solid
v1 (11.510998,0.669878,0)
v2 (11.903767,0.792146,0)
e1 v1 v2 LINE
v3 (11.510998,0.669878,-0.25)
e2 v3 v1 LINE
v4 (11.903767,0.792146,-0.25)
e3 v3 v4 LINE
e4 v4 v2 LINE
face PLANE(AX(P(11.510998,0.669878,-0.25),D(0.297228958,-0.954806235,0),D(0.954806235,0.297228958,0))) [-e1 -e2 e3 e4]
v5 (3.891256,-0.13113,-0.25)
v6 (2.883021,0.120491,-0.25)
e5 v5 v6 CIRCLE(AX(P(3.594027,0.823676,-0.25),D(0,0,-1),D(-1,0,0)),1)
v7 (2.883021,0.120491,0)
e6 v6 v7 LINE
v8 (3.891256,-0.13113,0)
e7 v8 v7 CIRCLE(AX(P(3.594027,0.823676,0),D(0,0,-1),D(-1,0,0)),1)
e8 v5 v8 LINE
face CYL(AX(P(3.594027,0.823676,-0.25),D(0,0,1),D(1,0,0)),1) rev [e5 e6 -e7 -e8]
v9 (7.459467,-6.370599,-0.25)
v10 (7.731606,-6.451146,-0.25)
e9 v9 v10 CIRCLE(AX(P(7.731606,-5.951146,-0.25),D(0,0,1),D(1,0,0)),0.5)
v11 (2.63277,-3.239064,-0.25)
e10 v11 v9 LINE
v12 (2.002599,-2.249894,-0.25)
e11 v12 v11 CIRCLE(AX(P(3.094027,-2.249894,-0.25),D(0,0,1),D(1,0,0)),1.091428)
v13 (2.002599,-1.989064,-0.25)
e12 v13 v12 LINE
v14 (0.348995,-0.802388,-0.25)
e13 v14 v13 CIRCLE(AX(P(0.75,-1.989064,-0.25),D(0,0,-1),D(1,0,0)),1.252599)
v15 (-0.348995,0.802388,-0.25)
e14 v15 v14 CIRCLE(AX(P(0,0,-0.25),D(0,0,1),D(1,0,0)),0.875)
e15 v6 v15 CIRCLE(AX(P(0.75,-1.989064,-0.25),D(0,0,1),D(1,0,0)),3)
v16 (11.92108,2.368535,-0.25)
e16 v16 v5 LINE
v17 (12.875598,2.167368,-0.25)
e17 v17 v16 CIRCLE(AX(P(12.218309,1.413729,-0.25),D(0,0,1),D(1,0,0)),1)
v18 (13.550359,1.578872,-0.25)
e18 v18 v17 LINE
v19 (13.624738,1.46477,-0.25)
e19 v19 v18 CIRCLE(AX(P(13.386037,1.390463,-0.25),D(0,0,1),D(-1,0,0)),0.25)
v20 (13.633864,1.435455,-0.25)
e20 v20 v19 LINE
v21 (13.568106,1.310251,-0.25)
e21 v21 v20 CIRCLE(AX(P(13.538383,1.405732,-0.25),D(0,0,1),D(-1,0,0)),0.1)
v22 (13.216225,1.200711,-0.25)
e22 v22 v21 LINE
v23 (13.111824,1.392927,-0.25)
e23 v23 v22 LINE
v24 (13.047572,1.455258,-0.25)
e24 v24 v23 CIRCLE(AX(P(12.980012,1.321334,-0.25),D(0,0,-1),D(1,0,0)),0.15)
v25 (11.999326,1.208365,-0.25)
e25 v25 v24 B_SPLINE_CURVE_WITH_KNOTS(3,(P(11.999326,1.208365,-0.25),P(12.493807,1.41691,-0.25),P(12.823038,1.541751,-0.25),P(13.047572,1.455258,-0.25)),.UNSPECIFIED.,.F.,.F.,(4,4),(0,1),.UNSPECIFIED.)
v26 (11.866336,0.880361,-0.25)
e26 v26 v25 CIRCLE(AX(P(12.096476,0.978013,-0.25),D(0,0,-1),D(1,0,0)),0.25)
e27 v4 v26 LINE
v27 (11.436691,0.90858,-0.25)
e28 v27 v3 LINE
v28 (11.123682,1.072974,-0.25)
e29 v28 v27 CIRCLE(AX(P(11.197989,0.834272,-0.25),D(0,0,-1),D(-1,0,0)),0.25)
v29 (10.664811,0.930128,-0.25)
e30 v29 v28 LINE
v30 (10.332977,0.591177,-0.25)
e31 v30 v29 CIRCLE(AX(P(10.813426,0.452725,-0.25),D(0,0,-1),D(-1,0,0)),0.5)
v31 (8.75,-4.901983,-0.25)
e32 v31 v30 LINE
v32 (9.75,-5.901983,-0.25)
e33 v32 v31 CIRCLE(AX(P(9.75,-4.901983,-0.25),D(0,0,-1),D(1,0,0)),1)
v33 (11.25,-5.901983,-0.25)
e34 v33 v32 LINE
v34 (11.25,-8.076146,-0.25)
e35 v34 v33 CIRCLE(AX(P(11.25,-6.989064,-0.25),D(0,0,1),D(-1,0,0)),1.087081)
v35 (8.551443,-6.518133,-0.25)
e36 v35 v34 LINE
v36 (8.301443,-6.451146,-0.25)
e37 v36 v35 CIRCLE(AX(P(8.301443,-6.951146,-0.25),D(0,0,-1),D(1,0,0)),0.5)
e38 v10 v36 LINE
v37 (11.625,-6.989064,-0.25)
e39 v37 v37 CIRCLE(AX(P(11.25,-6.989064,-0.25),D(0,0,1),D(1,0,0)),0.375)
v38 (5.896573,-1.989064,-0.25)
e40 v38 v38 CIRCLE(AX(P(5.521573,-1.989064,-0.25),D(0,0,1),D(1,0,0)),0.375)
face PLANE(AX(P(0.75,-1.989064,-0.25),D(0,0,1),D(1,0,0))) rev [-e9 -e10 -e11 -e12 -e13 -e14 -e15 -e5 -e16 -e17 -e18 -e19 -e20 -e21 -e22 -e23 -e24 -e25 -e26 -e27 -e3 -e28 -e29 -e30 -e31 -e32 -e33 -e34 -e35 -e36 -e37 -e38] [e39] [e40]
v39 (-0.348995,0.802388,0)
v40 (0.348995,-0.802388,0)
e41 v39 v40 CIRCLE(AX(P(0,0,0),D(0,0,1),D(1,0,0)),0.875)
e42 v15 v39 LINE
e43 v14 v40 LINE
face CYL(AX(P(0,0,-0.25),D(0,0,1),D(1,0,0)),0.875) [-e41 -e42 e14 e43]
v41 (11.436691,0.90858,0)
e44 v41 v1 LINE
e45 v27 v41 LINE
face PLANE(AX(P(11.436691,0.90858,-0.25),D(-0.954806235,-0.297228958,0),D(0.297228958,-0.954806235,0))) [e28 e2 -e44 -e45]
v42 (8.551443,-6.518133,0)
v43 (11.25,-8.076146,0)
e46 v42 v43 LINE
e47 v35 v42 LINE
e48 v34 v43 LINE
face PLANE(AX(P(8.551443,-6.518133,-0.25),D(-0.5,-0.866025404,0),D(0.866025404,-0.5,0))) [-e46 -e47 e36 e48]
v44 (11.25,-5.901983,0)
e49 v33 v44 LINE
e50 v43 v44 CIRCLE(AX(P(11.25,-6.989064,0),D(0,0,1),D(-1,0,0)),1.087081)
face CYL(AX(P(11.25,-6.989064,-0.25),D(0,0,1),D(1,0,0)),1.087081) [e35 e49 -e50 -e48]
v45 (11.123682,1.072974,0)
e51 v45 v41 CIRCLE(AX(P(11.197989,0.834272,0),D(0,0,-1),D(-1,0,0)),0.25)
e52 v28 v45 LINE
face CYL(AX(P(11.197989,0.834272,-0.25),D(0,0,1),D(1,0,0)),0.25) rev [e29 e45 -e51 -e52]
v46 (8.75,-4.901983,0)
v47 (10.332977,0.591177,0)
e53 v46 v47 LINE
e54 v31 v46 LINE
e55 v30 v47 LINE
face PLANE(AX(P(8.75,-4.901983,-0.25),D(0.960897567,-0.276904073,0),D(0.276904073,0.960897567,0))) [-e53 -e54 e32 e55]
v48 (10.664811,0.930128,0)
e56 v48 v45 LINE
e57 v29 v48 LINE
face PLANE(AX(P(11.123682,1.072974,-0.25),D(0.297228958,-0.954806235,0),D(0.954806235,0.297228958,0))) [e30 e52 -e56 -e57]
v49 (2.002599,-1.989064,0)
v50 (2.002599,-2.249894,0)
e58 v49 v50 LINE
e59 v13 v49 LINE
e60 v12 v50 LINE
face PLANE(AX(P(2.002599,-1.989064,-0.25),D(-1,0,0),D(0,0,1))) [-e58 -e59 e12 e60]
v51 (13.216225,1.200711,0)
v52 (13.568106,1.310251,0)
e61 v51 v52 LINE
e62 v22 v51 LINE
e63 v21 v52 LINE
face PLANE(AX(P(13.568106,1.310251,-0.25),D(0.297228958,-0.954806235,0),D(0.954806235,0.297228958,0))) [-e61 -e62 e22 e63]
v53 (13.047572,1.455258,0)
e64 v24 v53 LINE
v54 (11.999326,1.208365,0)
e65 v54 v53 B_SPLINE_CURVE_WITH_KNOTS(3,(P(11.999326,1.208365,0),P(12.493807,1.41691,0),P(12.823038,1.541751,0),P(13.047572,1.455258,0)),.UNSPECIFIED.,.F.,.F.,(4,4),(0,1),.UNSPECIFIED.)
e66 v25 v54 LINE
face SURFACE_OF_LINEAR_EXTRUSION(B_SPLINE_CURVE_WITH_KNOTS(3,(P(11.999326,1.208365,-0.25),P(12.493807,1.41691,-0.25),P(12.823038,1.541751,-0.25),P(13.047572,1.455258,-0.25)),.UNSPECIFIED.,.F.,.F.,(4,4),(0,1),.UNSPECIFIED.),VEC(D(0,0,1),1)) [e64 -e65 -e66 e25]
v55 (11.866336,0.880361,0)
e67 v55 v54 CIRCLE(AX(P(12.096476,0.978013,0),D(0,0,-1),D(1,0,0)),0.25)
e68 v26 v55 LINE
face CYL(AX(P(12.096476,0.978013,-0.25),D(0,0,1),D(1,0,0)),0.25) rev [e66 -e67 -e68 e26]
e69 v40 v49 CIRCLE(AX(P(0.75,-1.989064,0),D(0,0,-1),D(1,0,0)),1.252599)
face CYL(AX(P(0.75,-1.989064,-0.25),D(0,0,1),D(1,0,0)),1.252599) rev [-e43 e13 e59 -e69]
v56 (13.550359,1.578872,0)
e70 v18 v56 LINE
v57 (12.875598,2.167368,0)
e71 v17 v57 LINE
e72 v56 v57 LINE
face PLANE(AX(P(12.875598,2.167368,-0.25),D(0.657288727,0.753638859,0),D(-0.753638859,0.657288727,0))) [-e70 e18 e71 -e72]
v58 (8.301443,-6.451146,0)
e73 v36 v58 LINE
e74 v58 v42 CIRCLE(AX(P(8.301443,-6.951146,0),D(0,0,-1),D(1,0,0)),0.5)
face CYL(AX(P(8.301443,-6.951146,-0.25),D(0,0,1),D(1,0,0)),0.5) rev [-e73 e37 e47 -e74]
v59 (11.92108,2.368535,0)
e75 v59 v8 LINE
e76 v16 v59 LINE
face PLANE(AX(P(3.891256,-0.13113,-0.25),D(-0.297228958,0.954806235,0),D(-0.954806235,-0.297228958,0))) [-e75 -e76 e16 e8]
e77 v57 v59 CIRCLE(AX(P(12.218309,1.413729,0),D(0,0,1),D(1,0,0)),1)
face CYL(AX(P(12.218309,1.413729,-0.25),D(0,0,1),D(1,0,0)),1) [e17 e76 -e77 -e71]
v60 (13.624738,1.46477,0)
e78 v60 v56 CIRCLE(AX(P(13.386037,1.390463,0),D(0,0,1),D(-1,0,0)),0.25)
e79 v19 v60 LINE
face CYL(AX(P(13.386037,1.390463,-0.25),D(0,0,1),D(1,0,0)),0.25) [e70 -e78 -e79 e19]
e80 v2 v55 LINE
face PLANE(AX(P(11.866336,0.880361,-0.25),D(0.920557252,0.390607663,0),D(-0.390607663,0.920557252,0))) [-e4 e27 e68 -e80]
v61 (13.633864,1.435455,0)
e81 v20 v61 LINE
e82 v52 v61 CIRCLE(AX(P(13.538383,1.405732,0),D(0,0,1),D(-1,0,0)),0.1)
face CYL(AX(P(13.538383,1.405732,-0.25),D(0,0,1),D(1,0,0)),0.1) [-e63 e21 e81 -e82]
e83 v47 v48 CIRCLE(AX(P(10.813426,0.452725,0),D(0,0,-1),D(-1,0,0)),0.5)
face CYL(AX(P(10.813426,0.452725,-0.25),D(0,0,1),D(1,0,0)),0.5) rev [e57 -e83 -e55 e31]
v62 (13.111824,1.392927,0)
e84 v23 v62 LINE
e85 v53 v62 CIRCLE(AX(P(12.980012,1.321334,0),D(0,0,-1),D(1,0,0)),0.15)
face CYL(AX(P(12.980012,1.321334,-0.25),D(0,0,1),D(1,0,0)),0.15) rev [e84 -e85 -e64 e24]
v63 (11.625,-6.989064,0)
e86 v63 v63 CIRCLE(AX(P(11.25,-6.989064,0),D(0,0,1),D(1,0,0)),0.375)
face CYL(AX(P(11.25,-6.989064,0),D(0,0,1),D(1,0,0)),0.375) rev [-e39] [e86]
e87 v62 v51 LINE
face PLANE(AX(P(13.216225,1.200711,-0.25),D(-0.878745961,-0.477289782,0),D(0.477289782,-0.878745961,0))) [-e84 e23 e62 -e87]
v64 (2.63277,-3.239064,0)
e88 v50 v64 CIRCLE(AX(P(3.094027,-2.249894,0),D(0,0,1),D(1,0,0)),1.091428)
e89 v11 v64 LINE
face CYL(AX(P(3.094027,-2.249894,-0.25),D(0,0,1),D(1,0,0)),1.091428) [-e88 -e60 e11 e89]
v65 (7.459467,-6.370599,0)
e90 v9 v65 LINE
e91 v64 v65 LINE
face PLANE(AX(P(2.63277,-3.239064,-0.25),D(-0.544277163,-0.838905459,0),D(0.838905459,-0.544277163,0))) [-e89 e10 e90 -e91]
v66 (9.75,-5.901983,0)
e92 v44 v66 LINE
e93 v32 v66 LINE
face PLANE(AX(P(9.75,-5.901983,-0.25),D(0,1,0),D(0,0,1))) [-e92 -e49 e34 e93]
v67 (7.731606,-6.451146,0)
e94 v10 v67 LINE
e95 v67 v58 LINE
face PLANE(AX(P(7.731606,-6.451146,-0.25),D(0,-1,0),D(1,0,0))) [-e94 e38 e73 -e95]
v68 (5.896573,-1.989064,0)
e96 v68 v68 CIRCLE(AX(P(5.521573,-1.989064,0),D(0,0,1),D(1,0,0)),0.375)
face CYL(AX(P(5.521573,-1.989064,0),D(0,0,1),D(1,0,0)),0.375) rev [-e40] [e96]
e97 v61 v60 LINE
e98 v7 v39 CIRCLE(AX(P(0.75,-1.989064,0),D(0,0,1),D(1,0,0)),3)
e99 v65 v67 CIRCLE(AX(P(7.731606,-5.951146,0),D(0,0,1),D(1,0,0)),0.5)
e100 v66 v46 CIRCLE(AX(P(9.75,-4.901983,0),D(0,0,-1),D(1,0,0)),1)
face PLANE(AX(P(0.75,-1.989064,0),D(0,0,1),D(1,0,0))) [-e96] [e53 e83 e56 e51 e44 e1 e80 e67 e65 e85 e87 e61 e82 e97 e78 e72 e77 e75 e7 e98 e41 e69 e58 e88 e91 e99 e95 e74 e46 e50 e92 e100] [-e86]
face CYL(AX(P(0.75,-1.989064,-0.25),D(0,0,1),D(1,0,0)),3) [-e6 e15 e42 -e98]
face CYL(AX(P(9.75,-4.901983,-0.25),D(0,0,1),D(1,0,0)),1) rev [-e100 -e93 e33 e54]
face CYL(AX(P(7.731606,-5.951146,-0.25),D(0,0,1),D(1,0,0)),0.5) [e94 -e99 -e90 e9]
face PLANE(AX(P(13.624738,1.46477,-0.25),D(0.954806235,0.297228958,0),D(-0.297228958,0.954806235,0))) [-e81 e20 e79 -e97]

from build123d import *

# Parameters (mm, degrees)
BRIDA_START                = -0.25
BRIDA_BASE1_DEPTH          = 0.25
TALADRO_ROSCADO_M1X0_251_D = 0.75


# Read off the part's stored shape, not the designer's step: Brida base1
with BuildPart() as part:
    # Brida base1 outline → Brida base1 (new body)
    with BuildSketch(Plane.XY.offset(BRIDA_START)):
        with BuildLine():
            ThreePointArc((0.348995339, -0.802388468), (1.480310371, -0.971394868), (2.002599123, -1.989064424))
            Line((2.002599123, -1.989064424), (2.002599123, -2.249894418))
            ThreePointArc((2.002599123, -2.249894418), (2.173526137, -2.836318439), (2.632769916, -3.239064424))
            Line((2.632769916, -3.239064424), (7.459467188, -6.370598579))
            ThreePointArc((7.459467188, -6.370598579), (7.589701514, -6.430586338), (7.731605769, -6.45114585))
            Line((7.731605769, -6.45114585), (8.301442841, -6.45114585))
            ThreePointArc((8.301442841, -6.45114585), (8.430852364, -6.468182936), (8.551442841, -6.518133148))
            Line((8.551442841, -6.518133148), (11.25, -8.07614585))
            ThreePointArc((11.25, -8.07614585), (12.337081426, -6.989064424), (11.25, -5.901982998))
            Line((11.25, -5.901982998), (9.75, -5.901982998))
            ThreePointArc((9.75, -5.901982998), (9.042893219, -5.609089779), (8.75, -4.901982998))
            Line((8.75, -4.901982998), (10.332976724, 0.591177382))
            ThreePointArc((10.332976724, 0.591177382), (10.456141159, 0.802507984), (10.664811028, 0.930128463))
            Line((10.664811028, 0.930128463), (11.123681953, 1.072973914))
            ThreePointArc((11.123681953, 1.072973914), (11.314233531, 1.055602999), (11.436690752, 0.908579595))
            Line((11.436690752, 0.908579595), (11.510997991, 0.669878036))
            Line((11.510997991, 0.669878036), (11.903767414, 0.792146243))
            Line((11.903767414, 0.792146243), (11.866336414, 0.880361426))
            ThreePointArc((11.866336414, 0.880361426), (11.864794565, 1.071948516), (11.999325595, 1.208364763))
            add(Edge.make_bspline(
                [(11.999325595, 1.208364763), (12.49380663, 1.416910388), (12.823037685, 1.541751032), (13.047571984, 1.455257851)],
                knots=[0, 0, 0, 0, 1, 1, 1, 1], degree=3))
            ThreePointArc((13.047571984, 1.455257851), (13.084455869, 1.42899739), (13.111823575, 1.392927439))
            Line((13.111823575, 1.392927439), (13.216225488, 1.200711385))
            Line((13.216225488, 1.200711385), (13.568106318, 1.310251069))
            ThreePointArc((13.568106318, 1.310251069), (13.62691568, 1.359233957), (13.633864046, 1.435454588))
            Line((13.633864046, 1.435454588), (13.624738221, 1.464770016))
            ThreePointArc((13.624738221, 1.464770016), (13.595468937, 1.526984286), (13.550358844, 1.578872492))
            Line((13.550358844, 1.578872492), (12.875597811, 2.16736765))
            ThreePointArc((12.875597811, 2.16736765), (12.424531871, 2.392233856), (11.921080127, 2.368535026))
            Line((11.921080127, 2.368535026), (3.891256423, -0.131130397))
            ThreePointArc((3.891256423, -0.131130397), (3.351888367, -0.146565708), (2.883020599, 0.120490773))
            ThreePointArc((2.883020599, 0.120490773), (1.369312664, 0.946314909), (-0.348995339, 0.802388468))
            ThreePointArc((-0.348995339, 0.802388468), (-0.802388468, -0.348995339), (0.348995339, -0.802388468))
        make_face()
    extrude(amount=BRIDA_BASE1_DEPTH)

    # Taladro roscado M1x0.251 (through all)
    with Locations(Plane.XY):
        with Locations((5.521572875, -1.989064424), (11.25, -6.989064424), (0.75, -1.989064424)):
            Hole(TALADRO_ROSCADO_M1X0_251_D / 2)


solid = part.part
